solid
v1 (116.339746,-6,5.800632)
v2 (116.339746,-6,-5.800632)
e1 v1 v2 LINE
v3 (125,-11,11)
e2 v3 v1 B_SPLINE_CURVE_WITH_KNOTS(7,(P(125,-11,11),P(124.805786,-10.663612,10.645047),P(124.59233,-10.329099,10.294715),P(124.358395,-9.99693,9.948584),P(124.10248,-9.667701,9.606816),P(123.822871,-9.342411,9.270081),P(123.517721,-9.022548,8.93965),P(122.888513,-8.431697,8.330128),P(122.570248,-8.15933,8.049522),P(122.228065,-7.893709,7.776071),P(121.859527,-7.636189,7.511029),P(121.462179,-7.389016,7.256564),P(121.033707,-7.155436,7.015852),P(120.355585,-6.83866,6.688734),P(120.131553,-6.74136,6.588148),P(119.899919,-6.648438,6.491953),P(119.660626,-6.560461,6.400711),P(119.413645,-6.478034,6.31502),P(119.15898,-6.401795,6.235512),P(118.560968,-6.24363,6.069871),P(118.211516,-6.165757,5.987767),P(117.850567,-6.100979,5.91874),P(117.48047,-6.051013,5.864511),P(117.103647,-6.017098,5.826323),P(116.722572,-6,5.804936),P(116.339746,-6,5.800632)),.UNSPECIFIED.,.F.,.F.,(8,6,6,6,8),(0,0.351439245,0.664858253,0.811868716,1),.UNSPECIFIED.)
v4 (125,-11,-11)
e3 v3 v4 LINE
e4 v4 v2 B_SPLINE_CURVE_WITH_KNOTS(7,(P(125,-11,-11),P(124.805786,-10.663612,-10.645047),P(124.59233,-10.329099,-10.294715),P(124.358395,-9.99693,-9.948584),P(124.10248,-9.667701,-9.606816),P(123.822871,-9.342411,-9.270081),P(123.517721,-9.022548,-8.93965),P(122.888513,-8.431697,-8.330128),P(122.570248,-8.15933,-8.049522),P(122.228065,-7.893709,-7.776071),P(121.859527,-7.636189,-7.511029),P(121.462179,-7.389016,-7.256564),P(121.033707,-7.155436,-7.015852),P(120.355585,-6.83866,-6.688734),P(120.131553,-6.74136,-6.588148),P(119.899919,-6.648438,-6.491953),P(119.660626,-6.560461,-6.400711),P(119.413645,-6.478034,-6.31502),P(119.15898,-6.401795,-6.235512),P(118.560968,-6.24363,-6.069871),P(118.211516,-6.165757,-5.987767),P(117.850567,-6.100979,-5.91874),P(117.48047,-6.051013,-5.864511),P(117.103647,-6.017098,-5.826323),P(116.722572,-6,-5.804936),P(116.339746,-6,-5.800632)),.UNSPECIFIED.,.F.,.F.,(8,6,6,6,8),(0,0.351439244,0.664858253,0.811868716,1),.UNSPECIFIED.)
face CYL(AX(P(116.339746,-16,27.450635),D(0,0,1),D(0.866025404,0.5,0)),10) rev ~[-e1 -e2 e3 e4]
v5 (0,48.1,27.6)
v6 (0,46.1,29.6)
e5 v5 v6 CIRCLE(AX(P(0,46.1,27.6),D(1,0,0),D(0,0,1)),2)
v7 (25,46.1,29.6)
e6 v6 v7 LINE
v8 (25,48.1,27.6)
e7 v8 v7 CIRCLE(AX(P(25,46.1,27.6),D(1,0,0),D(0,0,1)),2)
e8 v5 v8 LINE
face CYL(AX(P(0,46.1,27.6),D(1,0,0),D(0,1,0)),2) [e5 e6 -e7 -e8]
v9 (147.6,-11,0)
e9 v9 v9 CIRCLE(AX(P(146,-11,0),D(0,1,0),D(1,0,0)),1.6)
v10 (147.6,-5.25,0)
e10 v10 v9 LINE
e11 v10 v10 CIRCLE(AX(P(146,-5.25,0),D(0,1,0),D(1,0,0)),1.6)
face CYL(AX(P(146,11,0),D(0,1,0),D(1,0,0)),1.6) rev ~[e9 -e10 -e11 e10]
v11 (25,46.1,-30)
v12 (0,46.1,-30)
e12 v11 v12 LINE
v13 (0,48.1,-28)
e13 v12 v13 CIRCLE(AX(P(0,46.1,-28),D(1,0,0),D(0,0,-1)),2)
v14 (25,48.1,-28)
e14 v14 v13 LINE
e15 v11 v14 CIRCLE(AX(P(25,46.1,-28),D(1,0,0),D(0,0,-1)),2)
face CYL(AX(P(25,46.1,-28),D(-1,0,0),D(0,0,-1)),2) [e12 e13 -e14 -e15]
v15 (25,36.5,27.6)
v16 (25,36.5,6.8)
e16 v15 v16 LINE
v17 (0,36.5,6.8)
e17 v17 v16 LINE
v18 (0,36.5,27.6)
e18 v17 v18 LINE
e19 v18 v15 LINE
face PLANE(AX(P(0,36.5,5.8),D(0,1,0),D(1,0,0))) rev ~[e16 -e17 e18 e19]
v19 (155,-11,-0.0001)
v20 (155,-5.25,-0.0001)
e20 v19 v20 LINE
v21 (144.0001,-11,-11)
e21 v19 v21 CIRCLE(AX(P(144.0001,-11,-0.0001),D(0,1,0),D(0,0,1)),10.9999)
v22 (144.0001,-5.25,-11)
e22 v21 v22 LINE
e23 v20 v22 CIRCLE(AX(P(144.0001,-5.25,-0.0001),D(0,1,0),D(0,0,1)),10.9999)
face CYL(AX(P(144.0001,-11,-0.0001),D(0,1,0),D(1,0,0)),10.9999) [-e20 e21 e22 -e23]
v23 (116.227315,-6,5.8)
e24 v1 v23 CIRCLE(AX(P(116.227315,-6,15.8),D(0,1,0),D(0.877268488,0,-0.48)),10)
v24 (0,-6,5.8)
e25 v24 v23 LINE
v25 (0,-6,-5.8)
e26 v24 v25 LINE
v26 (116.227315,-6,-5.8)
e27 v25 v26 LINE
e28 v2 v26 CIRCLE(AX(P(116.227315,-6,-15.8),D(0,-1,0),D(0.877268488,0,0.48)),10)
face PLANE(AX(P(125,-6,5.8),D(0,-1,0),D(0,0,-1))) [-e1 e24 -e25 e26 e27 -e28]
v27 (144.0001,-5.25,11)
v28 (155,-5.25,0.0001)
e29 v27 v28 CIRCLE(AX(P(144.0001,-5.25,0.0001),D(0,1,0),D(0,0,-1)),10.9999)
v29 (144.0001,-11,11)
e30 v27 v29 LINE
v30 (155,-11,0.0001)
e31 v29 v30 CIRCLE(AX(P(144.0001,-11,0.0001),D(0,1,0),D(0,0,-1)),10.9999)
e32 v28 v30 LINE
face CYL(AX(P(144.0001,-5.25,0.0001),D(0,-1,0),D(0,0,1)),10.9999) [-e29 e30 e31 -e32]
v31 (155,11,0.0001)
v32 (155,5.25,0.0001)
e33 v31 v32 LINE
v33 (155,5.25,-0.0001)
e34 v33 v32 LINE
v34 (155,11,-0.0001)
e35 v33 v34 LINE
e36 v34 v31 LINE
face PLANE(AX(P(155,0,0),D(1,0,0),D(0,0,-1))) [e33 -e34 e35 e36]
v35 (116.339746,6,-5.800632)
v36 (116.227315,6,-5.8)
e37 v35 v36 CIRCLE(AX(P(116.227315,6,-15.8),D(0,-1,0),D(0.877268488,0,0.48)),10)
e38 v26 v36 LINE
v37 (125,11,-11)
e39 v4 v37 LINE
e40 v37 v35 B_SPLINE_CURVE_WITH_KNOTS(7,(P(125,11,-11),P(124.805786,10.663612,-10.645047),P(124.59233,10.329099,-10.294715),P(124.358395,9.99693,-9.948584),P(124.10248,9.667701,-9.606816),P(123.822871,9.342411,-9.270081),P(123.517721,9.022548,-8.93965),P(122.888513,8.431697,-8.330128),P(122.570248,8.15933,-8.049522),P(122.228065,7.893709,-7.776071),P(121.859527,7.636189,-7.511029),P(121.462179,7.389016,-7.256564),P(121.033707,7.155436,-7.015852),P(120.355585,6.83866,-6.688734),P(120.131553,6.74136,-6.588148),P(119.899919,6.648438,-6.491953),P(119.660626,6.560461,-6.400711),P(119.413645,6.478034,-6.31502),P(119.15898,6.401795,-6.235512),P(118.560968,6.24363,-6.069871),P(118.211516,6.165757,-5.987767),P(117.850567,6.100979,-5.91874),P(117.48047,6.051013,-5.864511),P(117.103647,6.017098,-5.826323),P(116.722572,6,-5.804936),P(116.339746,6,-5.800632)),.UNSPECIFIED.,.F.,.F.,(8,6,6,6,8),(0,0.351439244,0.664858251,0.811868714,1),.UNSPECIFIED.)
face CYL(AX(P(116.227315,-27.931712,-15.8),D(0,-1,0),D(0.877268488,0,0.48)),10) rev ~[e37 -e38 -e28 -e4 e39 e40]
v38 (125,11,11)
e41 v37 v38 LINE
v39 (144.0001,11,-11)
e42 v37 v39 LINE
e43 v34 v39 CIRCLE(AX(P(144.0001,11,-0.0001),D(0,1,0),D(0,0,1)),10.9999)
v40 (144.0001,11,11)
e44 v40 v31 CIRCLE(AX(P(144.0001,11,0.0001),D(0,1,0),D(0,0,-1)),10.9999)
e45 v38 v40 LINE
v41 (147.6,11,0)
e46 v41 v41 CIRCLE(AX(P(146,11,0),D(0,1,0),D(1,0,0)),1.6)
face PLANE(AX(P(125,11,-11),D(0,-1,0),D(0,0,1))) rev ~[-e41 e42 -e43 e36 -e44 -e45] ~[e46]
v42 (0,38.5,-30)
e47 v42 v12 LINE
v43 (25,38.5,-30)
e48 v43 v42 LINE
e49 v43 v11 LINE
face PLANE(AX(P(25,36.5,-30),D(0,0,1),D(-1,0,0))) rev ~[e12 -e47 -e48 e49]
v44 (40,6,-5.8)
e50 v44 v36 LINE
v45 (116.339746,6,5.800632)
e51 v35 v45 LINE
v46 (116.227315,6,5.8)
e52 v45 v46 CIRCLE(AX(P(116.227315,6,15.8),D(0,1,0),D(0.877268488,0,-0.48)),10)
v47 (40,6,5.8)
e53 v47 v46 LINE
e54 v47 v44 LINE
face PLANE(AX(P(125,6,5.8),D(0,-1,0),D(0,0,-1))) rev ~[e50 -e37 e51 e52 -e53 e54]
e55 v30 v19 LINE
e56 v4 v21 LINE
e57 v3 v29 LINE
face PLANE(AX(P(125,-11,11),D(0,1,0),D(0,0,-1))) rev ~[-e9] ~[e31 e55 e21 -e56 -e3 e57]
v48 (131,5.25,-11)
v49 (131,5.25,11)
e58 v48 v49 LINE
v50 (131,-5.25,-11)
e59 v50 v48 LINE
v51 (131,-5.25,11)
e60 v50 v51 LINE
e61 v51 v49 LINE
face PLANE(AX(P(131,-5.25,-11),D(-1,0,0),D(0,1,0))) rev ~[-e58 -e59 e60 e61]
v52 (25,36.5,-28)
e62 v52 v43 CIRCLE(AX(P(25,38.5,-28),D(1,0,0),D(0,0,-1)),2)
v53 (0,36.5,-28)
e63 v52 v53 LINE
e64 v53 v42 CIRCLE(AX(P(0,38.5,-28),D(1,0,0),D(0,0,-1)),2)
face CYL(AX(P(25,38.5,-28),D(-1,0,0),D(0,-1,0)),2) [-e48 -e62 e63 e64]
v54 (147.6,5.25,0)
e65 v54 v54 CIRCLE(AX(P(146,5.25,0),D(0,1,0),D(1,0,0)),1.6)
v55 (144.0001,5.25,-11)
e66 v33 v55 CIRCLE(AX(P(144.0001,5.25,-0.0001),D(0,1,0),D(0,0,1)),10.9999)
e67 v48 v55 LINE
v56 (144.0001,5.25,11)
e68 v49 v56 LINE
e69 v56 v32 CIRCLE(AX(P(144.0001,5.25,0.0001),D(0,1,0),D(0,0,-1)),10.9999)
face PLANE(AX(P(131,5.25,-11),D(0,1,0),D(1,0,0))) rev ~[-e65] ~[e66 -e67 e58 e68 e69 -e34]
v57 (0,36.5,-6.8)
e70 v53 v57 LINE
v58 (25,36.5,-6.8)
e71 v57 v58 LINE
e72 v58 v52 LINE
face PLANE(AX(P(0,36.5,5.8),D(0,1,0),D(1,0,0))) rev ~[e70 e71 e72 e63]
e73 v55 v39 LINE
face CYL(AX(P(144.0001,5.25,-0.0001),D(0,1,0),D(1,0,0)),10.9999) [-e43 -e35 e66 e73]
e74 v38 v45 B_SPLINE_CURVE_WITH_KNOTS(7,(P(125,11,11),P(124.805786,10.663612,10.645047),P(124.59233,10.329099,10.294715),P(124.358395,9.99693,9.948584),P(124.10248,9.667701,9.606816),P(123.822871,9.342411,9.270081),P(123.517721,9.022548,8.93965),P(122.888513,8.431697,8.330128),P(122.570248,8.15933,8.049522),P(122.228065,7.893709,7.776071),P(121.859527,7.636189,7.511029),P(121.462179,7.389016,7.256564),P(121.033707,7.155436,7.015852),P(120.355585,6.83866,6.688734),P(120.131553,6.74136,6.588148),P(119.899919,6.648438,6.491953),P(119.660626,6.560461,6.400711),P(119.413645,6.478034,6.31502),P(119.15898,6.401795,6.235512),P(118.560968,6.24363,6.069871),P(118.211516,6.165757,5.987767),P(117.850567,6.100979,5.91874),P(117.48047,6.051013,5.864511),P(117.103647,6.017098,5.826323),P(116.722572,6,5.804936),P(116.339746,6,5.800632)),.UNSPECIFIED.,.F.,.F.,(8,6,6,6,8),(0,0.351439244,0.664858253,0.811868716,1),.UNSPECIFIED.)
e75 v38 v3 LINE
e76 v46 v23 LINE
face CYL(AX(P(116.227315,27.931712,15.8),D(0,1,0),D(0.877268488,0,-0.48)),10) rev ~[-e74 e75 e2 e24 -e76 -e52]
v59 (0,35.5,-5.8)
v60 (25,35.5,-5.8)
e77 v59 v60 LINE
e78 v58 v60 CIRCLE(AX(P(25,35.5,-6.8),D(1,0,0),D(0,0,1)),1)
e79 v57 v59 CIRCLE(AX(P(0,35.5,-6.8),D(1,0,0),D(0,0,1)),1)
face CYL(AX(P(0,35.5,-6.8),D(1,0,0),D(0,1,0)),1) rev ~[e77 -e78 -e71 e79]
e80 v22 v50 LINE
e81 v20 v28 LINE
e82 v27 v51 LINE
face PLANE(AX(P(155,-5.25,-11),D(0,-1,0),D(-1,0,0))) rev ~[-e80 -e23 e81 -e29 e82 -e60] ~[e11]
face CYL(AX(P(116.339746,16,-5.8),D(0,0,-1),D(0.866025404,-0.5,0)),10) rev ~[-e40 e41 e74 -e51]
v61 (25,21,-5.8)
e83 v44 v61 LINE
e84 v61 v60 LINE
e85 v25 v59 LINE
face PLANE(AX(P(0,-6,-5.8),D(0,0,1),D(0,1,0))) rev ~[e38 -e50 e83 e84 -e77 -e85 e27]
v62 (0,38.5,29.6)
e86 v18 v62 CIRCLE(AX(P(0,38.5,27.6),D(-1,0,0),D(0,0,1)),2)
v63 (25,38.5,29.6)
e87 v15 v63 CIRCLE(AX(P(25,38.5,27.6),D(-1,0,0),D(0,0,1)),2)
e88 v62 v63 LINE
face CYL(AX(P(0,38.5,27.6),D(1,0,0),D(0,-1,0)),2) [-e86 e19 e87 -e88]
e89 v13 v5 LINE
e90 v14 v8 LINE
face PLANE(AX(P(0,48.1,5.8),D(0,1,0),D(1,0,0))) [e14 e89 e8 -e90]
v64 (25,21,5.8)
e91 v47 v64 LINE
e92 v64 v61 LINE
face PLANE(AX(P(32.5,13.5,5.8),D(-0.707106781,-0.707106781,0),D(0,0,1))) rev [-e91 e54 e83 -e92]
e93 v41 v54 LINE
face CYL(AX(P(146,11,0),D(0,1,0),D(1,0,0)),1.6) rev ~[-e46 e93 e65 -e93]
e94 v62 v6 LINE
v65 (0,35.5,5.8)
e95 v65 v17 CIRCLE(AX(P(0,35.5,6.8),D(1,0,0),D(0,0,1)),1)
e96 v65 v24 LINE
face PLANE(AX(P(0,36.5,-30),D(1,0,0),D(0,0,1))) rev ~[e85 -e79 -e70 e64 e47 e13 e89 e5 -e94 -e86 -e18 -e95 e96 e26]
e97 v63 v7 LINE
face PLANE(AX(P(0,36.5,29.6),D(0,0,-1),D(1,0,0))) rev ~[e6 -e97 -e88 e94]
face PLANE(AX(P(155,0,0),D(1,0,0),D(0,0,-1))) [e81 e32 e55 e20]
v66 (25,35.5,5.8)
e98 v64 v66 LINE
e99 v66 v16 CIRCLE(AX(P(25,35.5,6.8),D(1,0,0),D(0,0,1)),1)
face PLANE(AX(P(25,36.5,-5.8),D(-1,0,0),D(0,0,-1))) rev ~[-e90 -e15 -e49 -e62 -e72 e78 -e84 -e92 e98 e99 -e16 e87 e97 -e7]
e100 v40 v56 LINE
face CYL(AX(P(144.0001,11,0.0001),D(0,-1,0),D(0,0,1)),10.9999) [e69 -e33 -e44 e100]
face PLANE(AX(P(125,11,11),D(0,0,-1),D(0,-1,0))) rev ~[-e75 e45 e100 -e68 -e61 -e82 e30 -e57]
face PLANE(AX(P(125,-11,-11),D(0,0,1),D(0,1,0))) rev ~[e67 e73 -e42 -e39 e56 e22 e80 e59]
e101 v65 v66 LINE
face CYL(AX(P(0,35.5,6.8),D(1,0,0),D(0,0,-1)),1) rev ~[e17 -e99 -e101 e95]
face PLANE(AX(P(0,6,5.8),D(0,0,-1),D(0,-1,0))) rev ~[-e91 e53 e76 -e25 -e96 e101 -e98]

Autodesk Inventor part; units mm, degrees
ref_plane "YZ Plane" through (0, 0, 0) normal (1, 0, 0) x (0, 1, 0)
ref_plane "XZ Plane" through (0, 0, 0) normal (0, 1, 0) x (-1, 0, 0)
ref_plane "XY Plane" through (0, 0, 0) normal (0, 0, 1) x (1, 0, 0)
sketch "草圖1" plane through (0, 0, 0) normal (1, 0, 0) x (0, 1, 0)
  line L0 (6, 5.8) -> (-6, 5.8)
  line L1 (-6, 5.8) -> (-6, -5.8)
  line L2 (-6, -5.8) -> (6, -5.8)
  line L3 (6, -5.8) -> (6, 5.8)
  line L4 (6, 5.8) -> (-6, -5.8) construction
  line L5 (-6, 5.8) -> (6, -5.8) construction
  point P0 (0, 0)
  dimension "d2" = 12
  dimension "d3" = 11.6
extrude "擠出1" add sketch "草圖1" along normal blind 125
sketch "草圖2" plane through (0, 6, 5.8) normal (0, 1, 0) x (1, 0, 0)
  line L0 (0, 0) -> (125, 0) projected
  line L1 (0, 11.6) -> (125, 11.6) projected
  line L2 (0, 0) -> (25, 0)
  line L3 (25, 0) -> (25, 11.6)
  line L4 (25, 11.6) -> (0, 11.6)
  line L5 (0, 11.6) -> (0, 0)
  point P0 (0, 5.8)
  point P1 (0, 11.6)
  dimension "d6" = 25
extrude "擠出2" add sketch "草圖2" along normal blind 30.5
sketch "草圖3" plane through (0, 36.5, 5.8) normal (0, 1, 0) x (1, 0, 0)
  line L0 (25, 35.8) -> (0, 35.8)
  line L1 (0, 35.8) -> (0, -23.8)
  line L2 (0, -23.8) -> (25, -23.8)
  line L3 (25, -23.8) -> (25, 35.8)
  line L4 (25, 0) -> (25, 11.6) projected
  line L5 (25, 0) -> (125, 0) projected
  point P0 (0, 5.8)
  point P1 (25, 5.8)
  dimension "d9" = 25
  dimension "d10" = 59.6
  dimension "d11" = 23.8
extrude "擠出3" add sketch "草圖3" along normal blind 11.6
sketch "草圖4" plane through (125, 0, 0) normal (1, 0, 0) x (0, 0, -1)
  line L0 (-11, -11) -> (11, -11)
  line L1 (11, -11) -> (11, 11)
  line L2 (11, 11) -> (-11, 11)
  line L3 (-11, 11) -> (-11, -11)
  line L4 (-11, -11) -> (11, 11) construction
  line L5 (11, -11) -> (-11, 11) construction
  point P0 (0, 0)
  dimension "d14" = 22
  dimension "d15" = 22
extrude "擠出4" add sketch "草圖4" along normal blind 30
sketch "草圖5" plane through (125, -11, -11) normal (0, 0, -1) x (-1, 0, 0)
  line L0 (-30, 0) -> (-30, 22) projected
  line L1 (-30, 5.75) -> (-6, 5.75)
  line L2 (-6, 5.75) -> (-6, 16.25)
  line L3 (-6, 16.25) -> (-30, 16.25)
  line L4 (-30, 16.25) -> (-30, 5.75)
  line L5 (0, 17) -> (0, 5) projected
  line L6 (0, 11) -> (-32.9331, 11) construction
  point P0 (125, 11)
  dimension "d18" = 10.5
  dimension "d19" = 24
extrude "擠出5" cut sketch "草圖5" against normal blind 30
sketch "草圖6" plane through (125, 11, 11) normal (0, 1, 0) x (1, 0, 0)
  line L0 (6, 22) -> (6, 0) construction
  line L1 (6, 22) -> (6, 0) construction
  line L2 (6, 11) -> (33.0459, 11) construction
  circle A0 centre (21, 11) radius 1.6
  point P0 (-125, 11)
  dimension "d22" = 15
  dimension "d23" = 3.2
extrude "擠出6" cut sketch "草圖6" against normal blind 30
fillet "圓角1" radius 11 4 edges at (155, 8.125, -11) (155, 8.125, 11) (155, -8.125, 11) (155, -8.125, -11)
fillet "圓角2" radius 10 4 edges at (125, 6, 0) (125, 0, 5.8) (125, 0, -5.8) (125, -6, 0)
chamfer "倒角1" distance 15 angle 45 1 edges at (25, 6, 0)
fillet "圓角3" radius 2 4 edges at (12.5, 48.1, -30) (12.5, 36.5, -30) (12.5, 36.5, 29.6) (12.5, 48.1, 29.6)
fillet "圓角4" radius 1 2 edges at (12.5, 36.5, 5.8) (12.5, 36.5, -5.8)
properties part number "support"
